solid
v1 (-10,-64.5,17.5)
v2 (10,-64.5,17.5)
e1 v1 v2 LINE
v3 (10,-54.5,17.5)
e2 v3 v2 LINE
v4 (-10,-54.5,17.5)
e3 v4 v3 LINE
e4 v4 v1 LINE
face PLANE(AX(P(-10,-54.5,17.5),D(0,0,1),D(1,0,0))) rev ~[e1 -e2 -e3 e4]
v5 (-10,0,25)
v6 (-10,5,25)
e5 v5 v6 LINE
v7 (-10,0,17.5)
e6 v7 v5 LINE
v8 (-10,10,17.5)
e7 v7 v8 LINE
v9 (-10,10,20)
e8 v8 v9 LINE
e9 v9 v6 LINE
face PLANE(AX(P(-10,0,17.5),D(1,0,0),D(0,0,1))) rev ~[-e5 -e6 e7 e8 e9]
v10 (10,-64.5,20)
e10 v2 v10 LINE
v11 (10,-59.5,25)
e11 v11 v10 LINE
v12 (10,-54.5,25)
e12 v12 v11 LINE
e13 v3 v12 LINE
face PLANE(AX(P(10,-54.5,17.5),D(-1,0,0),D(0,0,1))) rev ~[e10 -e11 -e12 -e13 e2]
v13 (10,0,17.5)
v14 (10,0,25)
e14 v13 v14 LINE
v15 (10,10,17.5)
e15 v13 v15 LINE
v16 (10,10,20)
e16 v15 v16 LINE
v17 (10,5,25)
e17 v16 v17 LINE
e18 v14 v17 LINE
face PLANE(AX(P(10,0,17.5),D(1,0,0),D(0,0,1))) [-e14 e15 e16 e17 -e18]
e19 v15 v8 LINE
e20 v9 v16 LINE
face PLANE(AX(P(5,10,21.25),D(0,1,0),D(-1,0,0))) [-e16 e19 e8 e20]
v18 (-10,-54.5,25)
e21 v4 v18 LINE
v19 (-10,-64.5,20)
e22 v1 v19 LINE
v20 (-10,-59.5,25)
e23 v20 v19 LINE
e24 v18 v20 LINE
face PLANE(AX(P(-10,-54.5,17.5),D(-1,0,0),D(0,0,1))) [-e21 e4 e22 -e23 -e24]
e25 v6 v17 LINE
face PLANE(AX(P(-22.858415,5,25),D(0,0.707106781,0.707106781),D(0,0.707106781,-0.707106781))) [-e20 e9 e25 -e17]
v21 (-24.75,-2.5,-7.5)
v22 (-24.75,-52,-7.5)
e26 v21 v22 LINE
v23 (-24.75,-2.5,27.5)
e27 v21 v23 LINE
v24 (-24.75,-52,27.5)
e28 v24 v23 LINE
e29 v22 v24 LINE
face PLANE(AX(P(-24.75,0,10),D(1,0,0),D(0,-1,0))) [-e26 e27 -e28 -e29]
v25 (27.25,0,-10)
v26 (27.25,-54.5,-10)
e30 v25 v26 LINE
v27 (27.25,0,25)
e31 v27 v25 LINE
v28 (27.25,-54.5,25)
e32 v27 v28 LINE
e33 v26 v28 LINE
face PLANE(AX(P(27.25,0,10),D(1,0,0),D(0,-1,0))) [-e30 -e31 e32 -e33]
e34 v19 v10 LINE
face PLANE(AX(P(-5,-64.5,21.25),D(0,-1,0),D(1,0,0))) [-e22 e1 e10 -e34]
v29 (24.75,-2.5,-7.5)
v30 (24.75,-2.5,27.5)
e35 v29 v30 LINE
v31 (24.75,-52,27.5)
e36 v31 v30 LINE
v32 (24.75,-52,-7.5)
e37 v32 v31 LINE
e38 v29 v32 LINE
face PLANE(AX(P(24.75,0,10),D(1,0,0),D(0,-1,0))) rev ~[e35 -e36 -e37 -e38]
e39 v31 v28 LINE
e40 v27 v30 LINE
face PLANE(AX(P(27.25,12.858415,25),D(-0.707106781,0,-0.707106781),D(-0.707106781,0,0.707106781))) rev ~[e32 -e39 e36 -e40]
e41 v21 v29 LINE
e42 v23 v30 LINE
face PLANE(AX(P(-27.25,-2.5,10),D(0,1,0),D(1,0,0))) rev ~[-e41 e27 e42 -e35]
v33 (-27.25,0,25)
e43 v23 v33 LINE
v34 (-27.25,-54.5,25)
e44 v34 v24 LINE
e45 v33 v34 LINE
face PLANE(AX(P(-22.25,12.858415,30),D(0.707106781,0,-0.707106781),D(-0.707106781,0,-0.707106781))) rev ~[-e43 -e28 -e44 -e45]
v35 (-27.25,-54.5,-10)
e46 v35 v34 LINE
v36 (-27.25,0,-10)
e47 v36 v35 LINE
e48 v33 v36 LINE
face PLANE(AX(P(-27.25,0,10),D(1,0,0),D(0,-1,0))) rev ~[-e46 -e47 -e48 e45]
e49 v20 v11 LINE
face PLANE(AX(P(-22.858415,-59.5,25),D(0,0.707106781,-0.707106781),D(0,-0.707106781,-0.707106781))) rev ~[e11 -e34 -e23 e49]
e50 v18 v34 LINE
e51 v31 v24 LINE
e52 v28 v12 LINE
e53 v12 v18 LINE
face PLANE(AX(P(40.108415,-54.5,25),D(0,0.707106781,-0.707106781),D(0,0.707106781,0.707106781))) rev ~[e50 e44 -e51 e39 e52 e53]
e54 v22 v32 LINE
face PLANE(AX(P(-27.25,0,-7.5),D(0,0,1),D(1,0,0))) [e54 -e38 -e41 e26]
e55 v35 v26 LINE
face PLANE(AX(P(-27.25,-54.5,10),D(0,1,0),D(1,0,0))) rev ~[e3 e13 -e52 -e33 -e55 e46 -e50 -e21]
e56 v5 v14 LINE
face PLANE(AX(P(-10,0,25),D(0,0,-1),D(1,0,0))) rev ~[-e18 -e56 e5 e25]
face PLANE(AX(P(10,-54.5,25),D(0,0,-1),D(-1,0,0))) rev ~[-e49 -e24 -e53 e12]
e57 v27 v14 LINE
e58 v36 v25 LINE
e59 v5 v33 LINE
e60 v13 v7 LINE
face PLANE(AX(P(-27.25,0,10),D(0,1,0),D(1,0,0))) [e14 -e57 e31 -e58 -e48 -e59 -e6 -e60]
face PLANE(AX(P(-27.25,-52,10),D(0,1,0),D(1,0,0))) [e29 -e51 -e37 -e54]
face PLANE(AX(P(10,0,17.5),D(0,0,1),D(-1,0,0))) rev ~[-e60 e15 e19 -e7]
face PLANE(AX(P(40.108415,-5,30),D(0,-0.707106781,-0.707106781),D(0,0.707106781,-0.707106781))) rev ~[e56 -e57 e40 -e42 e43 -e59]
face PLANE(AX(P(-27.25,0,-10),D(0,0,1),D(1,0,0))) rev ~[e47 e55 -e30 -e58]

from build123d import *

# Parameters (mm, degrees)
F0_W         = 54.5
F0_H         = 20
F1_DEPTH     = 54.5
F2_DEPTH     = 20
F3_T         = -2.5
F4_W         = 10
F4_H         = 7.5
F5_DEPTH     = 10
F6_W         = 10
F6_H         = 7.5
F7_DEPTH     = 10
F8_T1_DEPTH  = 45.7168298797
F8_T3_DEPTH  = 80.2168298797
F8_T8_DEPTH  = 80.2168298797
F8_T14_DEPTH = 80.2168298797
F8_T21_DEPTH = 80.2168298797
F8_T27_DEPTH = 80.2168298797
F8_T33_DEPTH = 80.2168298797
F8_T40_DEPTH = 80.2168298797


# Not quite as in the source:
# - a fillet or chamfer that OpenCascade refuses, or shapes differently, is made with other operations: its cross-section is extruded or revolved along the edge and cut away or added


with BuildPart() as f1:
    # F0 (on Front) → F1 (new body)
    with BuildSketch(Plane.XZ):
        Rectangle(F0_W, F0_H)
    extrude(amount=F1_DEPTH)

    # F2 (add): a face of the model
    f2_faces = [f1.faces().sort_by_distance(p)[0] for p in [
        (0, -27.25, 10),
    ]]
    extrude(f2_faces, amount=F2_DEPTH)

    # F3
    f3_openings = [f1.faces().sort_by_distance(p)[0] for p in [
        (0, -27.25, 30),
    ]]
    offset(amount=F3_T, openings=f3_openings)

    # F4 (on face) → F5 (join)
    with BuildSketch(Plane.XZ.offset(54.5)):
        with Locations((-5, 21.25)):
            Rectangle(F4_W, F4_H)
        with Locations((5, 21.25)):
            Rectangle(F4_W, F4_H)
    extrude(amount=F5_DEPTH)

    # F6 (on face) → F7 (join)
    with BuildSketch(Plane(origin=(0, 0, 0), x_dir=(-1, 0, 0), z_dir=(0, 1, 0))):
        with Locations((-5, 21.25)):
            Rectangle(F6_W, F6_H)
        with Locations((5, 21.25)):
            Rectangle(F6_W, F6_H)
    extrude(amount=F7_DEPTH)

    # F8: chamfer of 5 on 6 edges, made by hand

    # F8_s2 → F8_t1 (cut)
    with BuildSketch(Plane.YZ.offset(-22.8584149398)):
        Polygon((5, 25), (10, 20), (10, 25), align=None)
        Polygon((-59.5, 25), (-64.5, 20), (-64.5, 25), align=None)
    extrude(amount=F8_T1_DEPTH, mode=Mode.SUBTRACT)

    # F8_s4 → F8_t3 (cut)
    with BuildSketch(Plane.XZ.offset(-12.8584149398)):
        Polygon((-22.25, 30), (-27.25, 25), (-27.25, 30), align=None)
        Polygon((27.25, 25), (22.25, 30), (27.25, 30), align=None)
    extrude(amount=F8_T3_DEPTH, mode=Mode.SUBTRACT)


with BuildPart() as f8_tool6:
    # F8_s7 → F8_t8 (new body)
    with BuildSketch(Plane.YZ.offset(40.1084149398)):
        Polygon((-5, 30), (0, 25), (0, 30), align=None)
    extrude(amount=-F8_T8_DEPTH)

    split(bisect_by=Plane.YZ.offset(10), keep=Keep.TOP)

    split(bisect_by=Plane.XY.offset(25), keep=Keep.TOP)


with BuildPart() as f1_1:
    add(f1.part)

    # F8_t5: cut F8_tool6
    add(f8_tool6.part, mode=Mode.SUBTRACT)


with BuildPart() as f8_tool12:
    # F8_s13 → F8_t14 (new body)
    with BuildSketch(Plane.YZ.offset(40.1084149398)):
        Polygon((-5, 30), (0, 25), (0, 30), align=None)
    extrude(amount=-F8_T14_DEPTH)

    split(bisect_by=Plane.YZ.offset(10), keep=Keep.BOTTOM)

    split(bisect_by=Plane.XY.offset(25), keep=Keep.TOP)

    split(bisect_by=Plane.YZ.offset(-10), keep=Keep.TOP)


with BuildPart() as f1_2:
    add(f1_1.part)

    # F8_t11: cut F8_tool12
    add(f8_tool12.part, mode=Mode.SUBTRACT)


with BuildPart() as f8_tool19:
    # F8_s20 → F8_t21 (new body)
    with BuildSketch(Plane.YZ.offset(40.1084149398)):
        Polygon((-5, 30), (0, 25), (0, 30), align=None)
    extrude(amount=-F8_T21_DEPTH)

    split(bisect_by=Plane.XY.offset(25), keep=Keep.TOP)

    split(bisect_by=Plane.YZ.offset(-10), keep=Keep.BOTTOM)


with BuildPart() as f1_3:
    add(f1_2.part)

    # F8_t18: cut F8_tool19
    add(f8_tool19.part, mode=Mode.SUBTRACT)


with BuildPart() as f8_tool25:
    # F8_s26 → F8_t27 (new body)
    with BuildSketch(Plane.YZ.offset(40.1084149398)):
        Polygon((-54.5, 25), (-49.5, 30), (-54.5, 30), align=None)
    extrude(amount=-F8_T27_DEPTH)

    split(bisect_by=Plane.YZ.offset(10), keep=Keep.TOP)

    split(bisect_by=Plane.XY.offset(25), keep=Keep.TOP)


with BuildPart() as f1_4:
    add(f1_3.part)

    # F8_t24: cut F8_tool25
    add(f8_tool25.part, mode=Mode.SUBTRACT)


with BuildPart() as f8_tool31:
    # F8_s32 → F8_t33 (new body)
    with BuildSketch(Plane.YZ.offset(40.1084149398)):
        Polygon((-54.5, 25), (-49.5, 30), (-54.5, 30), align=None)
    extrude(amount=-F8_T33_DEPTH)

    split(bisect_by=Plane.YZ.offset(-10), keep=Keep.TOP)

    split(bisect_by=Plane.YZ.offset(10), keep=Keep.BOTTOM)

    split(bisect_by=Plane.XY.offset(25), keep=Keep.TOP)


with BuildPart() as f1_5:
    add(f1_4.part)

    # F8_t30: cut F8_tool31
    add(f8_tool31.part, mode=Mode.SUBTRACT)


with BuildPart() as f8_tool38:
    # F8_s39 → F8_t40 (new body)
    with BuildSketch(Plane.YZ.offset(40.1084149398)):
        Polygon((-54.5, 25), (-49.5, 30), (-54.5, 30), align=None)
    extrude(amount=-F8_T40_DEPTH)

    split(bisect_by=Plane.YZ.offset(-10), keep=Keep.BOTTOM)

    split(bisect_by=Plane.XY.offset(25), keep=Keep.TOP)


with BuildPart() as f1_6:
    add(f1_5.part)

    # F8_t37: cut F8_tool38
    add(f8_tool38.part, mode=Mode.SUBTRACT)


solid = f1_6.part
